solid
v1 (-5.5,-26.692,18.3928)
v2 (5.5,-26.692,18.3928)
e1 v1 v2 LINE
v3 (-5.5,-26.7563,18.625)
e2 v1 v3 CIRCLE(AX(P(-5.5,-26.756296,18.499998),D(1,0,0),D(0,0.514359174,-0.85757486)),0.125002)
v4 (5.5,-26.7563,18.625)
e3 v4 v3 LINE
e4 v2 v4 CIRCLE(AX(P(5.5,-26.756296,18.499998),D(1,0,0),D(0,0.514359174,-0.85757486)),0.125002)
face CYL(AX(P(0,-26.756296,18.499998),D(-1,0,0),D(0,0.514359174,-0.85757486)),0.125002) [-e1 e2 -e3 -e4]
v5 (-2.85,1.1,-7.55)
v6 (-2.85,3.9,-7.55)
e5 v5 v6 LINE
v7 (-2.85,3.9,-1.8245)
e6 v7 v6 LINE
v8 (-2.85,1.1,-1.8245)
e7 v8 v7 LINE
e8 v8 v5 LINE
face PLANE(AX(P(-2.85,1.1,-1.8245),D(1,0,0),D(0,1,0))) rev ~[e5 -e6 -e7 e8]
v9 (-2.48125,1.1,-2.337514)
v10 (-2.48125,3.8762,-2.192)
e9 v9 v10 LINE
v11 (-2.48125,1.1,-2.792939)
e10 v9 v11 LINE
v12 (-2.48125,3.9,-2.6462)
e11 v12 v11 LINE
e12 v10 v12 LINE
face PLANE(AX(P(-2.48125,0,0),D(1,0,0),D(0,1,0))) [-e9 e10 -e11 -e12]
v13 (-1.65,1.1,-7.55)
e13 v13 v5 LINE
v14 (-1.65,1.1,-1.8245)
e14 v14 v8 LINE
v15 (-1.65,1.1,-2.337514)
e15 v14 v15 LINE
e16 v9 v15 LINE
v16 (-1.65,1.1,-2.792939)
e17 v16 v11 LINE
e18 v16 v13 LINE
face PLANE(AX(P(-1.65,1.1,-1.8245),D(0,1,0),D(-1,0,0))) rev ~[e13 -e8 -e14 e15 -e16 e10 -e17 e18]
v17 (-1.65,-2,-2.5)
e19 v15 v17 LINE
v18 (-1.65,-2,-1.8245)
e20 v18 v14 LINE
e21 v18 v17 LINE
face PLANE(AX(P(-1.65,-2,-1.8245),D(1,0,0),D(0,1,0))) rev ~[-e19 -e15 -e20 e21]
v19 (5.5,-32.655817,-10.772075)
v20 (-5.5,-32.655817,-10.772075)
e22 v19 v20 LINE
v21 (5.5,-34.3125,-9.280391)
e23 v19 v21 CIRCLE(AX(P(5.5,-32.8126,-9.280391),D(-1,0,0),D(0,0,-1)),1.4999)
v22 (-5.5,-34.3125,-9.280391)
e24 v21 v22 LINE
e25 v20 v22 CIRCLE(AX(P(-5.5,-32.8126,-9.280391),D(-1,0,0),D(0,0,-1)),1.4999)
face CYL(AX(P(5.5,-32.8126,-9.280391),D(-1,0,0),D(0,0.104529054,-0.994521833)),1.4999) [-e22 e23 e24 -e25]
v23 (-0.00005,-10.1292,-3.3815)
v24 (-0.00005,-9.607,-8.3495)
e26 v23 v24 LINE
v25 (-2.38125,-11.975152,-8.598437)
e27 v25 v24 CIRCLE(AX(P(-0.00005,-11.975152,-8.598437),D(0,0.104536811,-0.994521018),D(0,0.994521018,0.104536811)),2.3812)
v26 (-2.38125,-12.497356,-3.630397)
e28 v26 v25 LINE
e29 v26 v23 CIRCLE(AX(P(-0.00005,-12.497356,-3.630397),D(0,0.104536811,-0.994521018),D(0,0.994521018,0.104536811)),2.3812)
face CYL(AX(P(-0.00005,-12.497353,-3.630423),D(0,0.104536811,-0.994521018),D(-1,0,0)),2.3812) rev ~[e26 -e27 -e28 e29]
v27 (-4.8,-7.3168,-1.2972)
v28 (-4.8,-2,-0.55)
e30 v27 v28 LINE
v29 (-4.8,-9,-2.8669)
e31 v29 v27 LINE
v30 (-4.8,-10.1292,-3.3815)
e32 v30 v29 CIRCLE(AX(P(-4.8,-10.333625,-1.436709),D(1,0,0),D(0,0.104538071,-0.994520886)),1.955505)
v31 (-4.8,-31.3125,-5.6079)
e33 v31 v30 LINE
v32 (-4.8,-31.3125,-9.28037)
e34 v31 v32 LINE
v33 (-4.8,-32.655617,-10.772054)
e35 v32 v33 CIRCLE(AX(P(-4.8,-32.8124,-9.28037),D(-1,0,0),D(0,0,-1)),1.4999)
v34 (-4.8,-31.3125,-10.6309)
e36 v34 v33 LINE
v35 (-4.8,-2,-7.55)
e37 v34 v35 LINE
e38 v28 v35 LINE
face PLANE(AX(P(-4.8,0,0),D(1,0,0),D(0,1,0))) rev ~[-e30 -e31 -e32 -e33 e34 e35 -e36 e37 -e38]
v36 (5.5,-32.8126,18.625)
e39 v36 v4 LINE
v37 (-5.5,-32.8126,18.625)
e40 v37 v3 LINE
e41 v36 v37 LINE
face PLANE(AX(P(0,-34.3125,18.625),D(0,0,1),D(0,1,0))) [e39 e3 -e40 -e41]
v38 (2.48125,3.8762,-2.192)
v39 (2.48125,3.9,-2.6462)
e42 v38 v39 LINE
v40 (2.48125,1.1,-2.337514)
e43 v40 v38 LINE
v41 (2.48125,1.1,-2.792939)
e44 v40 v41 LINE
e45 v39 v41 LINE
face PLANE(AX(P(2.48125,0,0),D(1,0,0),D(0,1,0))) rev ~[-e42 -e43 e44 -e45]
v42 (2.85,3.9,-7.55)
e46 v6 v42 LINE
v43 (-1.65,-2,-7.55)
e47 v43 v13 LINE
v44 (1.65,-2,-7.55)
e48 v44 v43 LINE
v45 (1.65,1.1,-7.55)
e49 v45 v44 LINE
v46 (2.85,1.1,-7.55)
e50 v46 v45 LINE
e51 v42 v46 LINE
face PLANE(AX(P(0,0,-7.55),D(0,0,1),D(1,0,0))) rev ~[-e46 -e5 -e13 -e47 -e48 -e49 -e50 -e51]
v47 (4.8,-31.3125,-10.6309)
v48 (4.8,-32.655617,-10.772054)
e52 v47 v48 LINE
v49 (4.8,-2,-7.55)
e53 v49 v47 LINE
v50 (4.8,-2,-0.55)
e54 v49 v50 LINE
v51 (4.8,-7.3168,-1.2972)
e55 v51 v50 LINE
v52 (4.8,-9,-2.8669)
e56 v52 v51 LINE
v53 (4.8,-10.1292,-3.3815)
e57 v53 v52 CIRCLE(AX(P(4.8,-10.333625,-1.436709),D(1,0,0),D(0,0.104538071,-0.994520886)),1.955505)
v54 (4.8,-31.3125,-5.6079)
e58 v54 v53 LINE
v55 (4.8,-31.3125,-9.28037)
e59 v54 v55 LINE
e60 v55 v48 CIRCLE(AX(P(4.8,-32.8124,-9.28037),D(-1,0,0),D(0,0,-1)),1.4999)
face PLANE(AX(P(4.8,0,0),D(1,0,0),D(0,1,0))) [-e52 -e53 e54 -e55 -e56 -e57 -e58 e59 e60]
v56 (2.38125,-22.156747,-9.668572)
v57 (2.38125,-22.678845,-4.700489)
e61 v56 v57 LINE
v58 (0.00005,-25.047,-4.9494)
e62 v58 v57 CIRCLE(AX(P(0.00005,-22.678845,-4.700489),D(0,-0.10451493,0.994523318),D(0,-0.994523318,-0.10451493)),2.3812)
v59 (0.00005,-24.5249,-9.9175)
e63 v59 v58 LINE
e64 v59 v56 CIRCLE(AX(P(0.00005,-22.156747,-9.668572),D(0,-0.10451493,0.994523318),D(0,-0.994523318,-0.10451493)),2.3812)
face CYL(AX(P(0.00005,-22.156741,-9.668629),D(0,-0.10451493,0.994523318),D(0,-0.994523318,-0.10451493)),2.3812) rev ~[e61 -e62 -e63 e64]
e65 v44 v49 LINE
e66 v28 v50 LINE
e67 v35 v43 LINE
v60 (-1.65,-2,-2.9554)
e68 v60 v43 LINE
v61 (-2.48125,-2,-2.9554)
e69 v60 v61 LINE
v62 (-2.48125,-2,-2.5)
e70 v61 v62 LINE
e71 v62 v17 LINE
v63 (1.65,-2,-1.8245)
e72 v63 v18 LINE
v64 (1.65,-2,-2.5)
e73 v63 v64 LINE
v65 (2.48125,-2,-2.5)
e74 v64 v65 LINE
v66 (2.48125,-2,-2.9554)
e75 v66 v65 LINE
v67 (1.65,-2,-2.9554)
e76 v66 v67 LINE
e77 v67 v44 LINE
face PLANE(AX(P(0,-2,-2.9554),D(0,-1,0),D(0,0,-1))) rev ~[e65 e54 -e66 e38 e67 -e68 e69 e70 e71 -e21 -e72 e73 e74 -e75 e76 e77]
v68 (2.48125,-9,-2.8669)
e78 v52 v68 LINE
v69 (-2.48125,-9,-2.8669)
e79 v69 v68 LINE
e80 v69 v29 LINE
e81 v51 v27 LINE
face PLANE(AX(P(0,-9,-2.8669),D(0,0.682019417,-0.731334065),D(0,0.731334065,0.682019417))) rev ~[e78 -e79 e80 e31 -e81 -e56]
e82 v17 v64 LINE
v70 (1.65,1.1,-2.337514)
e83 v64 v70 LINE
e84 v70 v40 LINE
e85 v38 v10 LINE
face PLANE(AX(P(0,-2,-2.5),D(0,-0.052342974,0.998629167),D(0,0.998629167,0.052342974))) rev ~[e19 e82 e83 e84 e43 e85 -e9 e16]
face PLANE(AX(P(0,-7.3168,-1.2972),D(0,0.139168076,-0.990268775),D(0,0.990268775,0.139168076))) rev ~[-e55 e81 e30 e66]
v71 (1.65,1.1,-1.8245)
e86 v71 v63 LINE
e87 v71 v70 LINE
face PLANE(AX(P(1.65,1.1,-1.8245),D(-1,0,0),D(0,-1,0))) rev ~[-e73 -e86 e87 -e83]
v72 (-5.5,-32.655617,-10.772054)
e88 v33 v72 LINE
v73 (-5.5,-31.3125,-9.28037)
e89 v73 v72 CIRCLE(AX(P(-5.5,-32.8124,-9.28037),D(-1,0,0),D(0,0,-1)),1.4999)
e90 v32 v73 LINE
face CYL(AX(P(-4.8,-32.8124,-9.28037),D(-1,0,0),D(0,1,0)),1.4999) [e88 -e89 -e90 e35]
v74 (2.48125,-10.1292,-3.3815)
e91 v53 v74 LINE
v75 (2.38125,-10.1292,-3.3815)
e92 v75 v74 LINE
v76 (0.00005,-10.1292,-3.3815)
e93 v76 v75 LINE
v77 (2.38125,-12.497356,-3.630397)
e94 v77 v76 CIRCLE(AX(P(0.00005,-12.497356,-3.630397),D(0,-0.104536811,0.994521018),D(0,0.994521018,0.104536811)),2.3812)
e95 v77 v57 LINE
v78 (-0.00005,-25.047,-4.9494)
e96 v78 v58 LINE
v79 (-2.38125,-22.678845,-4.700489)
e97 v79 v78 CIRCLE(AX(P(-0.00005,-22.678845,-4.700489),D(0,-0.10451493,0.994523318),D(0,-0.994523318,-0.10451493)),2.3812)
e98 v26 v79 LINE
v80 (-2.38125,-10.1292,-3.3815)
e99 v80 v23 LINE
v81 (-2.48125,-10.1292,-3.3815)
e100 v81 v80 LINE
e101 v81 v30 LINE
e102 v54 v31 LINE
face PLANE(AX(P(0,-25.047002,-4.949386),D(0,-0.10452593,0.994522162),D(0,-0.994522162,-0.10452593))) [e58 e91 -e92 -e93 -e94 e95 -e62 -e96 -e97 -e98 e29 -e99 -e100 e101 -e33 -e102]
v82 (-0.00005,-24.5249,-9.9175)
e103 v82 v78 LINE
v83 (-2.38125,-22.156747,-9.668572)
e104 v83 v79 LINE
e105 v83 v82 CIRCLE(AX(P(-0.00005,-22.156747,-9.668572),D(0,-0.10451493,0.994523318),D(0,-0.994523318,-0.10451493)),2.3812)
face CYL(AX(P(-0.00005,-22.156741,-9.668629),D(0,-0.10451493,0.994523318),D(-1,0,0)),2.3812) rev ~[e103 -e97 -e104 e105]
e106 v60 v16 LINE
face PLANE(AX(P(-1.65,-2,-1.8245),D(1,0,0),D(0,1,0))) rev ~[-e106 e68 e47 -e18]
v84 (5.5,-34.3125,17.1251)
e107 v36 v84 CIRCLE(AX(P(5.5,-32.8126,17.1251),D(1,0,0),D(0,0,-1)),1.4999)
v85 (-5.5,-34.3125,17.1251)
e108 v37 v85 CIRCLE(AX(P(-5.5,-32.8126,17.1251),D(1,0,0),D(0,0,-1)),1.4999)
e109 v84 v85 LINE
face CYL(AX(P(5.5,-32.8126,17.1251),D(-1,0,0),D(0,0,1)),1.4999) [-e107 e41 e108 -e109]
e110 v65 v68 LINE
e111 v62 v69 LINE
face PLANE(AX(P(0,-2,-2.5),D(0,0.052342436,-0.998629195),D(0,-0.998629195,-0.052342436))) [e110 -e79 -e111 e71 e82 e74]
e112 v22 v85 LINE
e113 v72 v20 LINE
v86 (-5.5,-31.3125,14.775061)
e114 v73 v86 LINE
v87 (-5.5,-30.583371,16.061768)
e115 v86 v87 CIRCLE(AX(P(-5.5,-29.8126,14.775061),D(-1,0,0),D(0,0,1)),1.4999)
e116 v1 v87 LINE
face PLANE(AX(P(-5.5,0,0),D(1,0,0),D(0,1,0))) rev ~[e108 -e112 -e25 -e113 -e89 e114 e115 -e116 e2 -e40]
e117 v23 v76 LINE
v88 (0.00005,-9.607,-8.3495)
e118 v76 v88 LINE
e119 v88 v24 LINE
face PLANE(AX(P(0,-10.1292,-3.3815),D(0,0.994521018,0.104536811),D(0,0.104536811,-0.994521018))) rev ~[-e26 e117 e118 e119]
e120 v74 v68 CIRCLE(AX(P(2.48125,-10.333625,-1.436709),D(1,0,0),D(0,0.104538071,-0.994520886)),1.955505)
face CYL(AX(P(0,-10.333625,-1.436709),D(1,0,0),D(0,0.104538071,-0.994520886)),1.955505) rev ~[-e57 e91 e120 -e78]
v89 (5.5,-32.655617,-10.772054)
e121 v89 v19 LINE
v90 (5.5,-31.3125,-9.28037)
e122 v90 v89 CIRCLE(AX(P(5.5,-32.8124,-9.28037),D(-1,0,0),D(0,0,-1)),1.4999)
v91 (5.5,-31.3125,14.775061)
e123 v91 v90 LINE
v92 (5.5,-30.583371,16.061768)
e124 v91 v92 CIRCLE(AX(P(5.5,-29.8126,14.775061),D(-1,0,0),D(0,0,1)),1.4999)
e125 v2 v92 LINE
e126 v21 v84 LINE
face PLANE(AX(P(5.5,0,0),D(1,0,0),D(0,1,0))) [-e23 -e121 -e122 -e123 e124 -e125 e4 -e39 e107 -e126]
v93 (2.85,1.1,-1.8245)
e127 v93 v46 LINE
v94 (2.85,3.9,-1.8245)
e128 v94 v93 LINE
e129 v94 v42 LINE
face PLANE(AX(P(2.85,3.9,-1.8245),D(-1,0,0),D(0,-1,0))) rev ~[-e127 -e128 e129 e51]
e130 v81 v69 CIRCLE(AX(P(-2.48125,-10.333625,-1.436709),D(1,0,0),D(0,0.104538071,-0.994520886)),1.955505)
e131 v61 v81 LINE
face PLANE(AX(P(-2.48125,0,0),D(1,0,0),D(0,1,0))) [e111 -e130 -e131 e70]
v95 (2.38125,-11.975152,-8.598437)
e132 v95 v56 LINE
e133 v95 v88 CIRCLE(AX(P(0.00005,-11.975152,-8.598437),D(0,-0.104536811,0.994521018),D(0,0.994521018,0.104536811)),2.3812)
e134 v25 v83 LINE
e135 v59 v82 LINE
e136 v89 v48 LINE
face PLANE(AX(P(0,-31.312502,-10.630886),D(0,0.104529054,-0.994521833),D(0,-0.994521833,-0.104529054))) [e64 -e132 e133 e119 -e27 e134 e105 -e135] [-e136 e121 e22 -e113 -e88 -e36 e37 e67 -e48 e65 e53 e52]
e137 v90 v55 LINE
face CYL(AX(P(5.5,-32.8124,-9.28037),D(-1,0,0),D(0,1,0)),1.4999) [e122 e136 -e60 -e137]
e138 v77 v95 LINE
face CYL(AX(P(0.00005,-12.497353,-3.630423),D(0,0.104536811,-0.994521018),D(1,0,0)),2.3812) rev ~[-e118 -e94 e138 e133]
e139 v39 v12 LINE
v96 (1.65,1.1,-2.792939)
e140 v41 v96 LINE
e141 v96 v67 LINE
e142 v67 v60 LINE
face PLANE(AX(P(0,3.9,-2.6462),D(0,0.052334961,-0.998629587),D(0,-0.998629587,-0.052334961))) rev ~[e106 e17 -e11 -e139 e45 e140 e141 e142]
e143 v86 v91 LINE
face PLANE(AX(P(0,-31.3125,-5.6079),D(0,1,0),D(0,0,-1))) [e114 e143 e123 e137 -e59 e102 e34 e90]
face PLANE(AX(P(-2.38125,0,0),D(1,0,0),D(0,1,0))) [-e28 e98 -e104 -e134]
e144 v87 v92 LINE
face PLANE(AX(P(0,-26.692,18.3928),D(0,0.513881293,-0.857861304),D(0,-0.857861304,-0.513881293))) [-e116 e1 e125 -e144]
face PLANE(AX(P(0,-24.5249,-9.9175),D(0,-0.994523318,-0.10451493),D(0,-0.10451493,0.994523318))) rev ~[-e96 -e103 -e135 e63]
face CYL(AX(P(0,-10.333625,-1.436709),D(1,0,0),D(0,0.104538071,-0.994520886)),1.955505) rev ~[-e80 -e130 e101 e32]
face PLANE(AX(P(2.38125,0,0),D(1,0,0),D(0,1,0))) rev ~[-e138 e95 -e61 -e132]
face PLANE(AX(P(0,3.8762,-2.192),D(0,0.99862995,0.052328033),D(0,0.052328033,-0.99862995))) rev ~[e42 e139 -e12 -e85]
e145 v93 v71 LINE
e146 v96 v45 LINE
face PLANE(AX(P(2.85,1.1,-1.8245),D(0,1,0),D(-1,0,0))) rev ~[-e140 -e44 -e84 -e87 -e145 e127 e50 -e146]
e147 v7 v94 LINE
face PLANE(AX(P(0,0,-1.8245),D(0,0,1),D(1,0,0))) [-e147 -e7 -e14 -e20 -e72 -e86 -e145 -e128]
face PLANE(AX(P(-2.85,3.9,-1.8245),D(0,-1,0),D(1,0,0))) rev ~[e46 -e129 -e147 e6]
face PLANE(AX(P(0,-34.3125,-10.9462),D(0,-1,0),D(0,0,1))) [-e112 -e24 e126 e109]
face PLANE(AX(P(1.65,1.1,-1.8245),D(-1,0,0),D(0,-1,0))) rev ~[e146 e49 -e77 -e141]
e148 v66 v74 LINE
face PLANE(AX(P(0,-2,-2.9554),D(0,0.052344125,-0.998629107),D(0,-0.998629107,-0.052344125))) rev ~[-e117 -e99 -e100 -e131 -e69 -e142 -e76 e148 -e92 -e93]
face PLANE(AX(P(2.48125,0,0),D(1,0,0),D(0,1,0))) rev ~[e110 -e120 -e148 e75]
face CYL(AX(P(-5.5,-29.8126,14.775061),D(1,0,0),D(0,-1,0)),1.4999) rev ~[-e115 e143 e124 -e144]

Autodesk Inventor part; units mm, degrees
ref_plane "YZ Plane" through (0, 0, 0) normal (1, 0, 0) x (0, 1, 0)
ref_plane "XZ Plane" through (0, 0, 0) normal (0, 1, 0) x (-1, 0, 0)
ref_plane "Neck Start Plane" through (0, 0, -1.8245) normal (0, 0, 1) x (1, 0, 0)
sketch "Arm Profile" plane through (0, 0, 0) normal (1, 0, 0) x (0, 1, 0)
  line L0 (-2, -0.55) -> (-2, -7.55)
  line L1 (-2, -7.55) -> (-34.3125, -10.9462)
  line L2 (-34.3125, 18.625) -> (-26.7563, 18.625)
  line L3 (-26.692, 18.3928) -> (-31.3125, 15.625)
  arc A0 (-26.692, 18.3928) -> (-26.7563, 18.625) centre (-26.7563, 18.5) ccw
  line L4 (0, 0) -> (-30.5125, 0) construction
  line L5 (-30.5125, 0) -> (-31.3125, 0) construction
  line L6 (-2, -2.9554) -> (-10.1292, -3.3815)
  line L7 (-2, -2.5) -> (-9, -2.8669)
  line L8 (-9, -2.8669) -> (-7.3168, -1.2972)
  line L9 (-7.3168, -1.2972) -> (-2, -0.55)
  line L10 (-10.1292, -3.3815) -> (-31.3125, -5.6079)
  arc A1 (-10.1292, -3.3815) -> (-9, -2.8669) centre (-10.3336, -1.4368) ccw
  line L11 (-2, -2.5) -> (3.8762, -2.192)
  line L12 (3.8762, -2.192) -> (3.9, -2.6462)
  line L13 (3.9, -2.6462) -> (-2, -2.9554)
  line L14 (-31.3125, -5.6079) -> (-31.3125, 15.625)
  line L15 (-34.3125, -10.9462) -> (-34.3125, 18.625)
  line L16 (-31.3125, -5.6079) -> (-31.3125, -10.6309)
  line L17 (-24.5249, -9.9175) -> (-25.047, -4.9494)
  line L18 (-10.1292, -3.3815) -> (-9.607, -8.3495)
  point P0 (-7.4117, -1.3306)
  dimension "d0" = 0.125
  dimension "d1" = 26.7563
  dimension "d2" = 18.5
  dimension "d7" = 3
  dimension "d85" = 2
  dimension "neckDepth" = 7
  dimension "d119" = 30.5125
  dimension "d121" = 0.55
  dimension "d129" = 0.4548
  dimension "d132" = 8
  dimension "d136" = 145
  dimension "d137" = 7
  dimension "d138" = 5.9
  dimension "pincherArmThick" = 3
  dimension "d141" = 0.8
  dimension "d147" = 15
  dimension "d148" = 6
  dimension "d151" = 177
  dimension "d153" = 2.5
extrude "Main Arm" add sketch "Arm Profile" along normal mid plane 9.6 contours L0 L7 L8 L9 | L0 L6 A1 L7 | L0 L1 L18 L6 | L18 L1 L17 L10 | L17 L1 L16 L10
extrude "Pincher" add sketch "Arm Profile" along normal mid plane 11 contours L16 L1 L15 L2 A0 L3 L14
sketch "Neck Sketch" plane through (0, 0, -1.8245) normal (0, 0, 1) x (1, 0, 0)
  line L0 (-1.65, -2) -> (-1.65, 1.1)
  line L1 (-2.85, 3.9) -> (2.85, 3.9)
  line L2 (1.65, 1.1) -> (1.65, -2)
  line L3 (0, -2) -> (0, 3.9) construction
  line L4 (-1.65, 1.1) -> (-2.85, 1.1)
  line L5 (-2.85, 1.1) -> (-2.85, 3.9)
  line L6 (2.85, 3.9) -> (2.85, 1.1)
  line L7 (2.85, 1.1) -> (1.65, 1.1)
  line L8 (1.65, -2) -> (-1.65, -2)
  point P0 (0, 0)
  dimension "neckWidth" = 3.3
  dimension "headWidth" = 5.7
  dimension "headHeight" = 2.8
  dimension "d91" = 2
  dimension "d103" = 1.1
  dimension "neckHeight" = 5.9
extrude "Neck" add sketch "Neck Sketch" against normal blind 5.7255
extrude "Spring Steel Slot" cut sketch "Arm Profile" along normal mid plane 4.9625 contours L11 L12 L13 L0 | L0 L6 A1 L7
extrude "Viewport" cut sketch "Arm Profile" along normal mid plane 4.7625 contours L18 L1 L17 L10
fillet "Fillet1" radius 1.5 5 edges at (-5.15, -31.3125, -10.6309) (5.15, -31.3125, -10.6309) (0, -34.3125, -10.9462) (0, -31.3125, 15.625) (0, -34.3125, 18.625)
fillet "Fillet2" radius 2.3813 4 edges at (-2.3813, -24.7859, -7.4334) (2.3813, -24.7859, -7.4334) (2.3813, -9.8681, -5.8655) (-2.3813, -9.8681, -5.8655)
equation "\"d2\" = hingeToPincherHoriz"
equation "\"spacing\" = 1"
equation "\"hingeToPincherHoriz\" = 18.5"
properties part number "Lever1"
